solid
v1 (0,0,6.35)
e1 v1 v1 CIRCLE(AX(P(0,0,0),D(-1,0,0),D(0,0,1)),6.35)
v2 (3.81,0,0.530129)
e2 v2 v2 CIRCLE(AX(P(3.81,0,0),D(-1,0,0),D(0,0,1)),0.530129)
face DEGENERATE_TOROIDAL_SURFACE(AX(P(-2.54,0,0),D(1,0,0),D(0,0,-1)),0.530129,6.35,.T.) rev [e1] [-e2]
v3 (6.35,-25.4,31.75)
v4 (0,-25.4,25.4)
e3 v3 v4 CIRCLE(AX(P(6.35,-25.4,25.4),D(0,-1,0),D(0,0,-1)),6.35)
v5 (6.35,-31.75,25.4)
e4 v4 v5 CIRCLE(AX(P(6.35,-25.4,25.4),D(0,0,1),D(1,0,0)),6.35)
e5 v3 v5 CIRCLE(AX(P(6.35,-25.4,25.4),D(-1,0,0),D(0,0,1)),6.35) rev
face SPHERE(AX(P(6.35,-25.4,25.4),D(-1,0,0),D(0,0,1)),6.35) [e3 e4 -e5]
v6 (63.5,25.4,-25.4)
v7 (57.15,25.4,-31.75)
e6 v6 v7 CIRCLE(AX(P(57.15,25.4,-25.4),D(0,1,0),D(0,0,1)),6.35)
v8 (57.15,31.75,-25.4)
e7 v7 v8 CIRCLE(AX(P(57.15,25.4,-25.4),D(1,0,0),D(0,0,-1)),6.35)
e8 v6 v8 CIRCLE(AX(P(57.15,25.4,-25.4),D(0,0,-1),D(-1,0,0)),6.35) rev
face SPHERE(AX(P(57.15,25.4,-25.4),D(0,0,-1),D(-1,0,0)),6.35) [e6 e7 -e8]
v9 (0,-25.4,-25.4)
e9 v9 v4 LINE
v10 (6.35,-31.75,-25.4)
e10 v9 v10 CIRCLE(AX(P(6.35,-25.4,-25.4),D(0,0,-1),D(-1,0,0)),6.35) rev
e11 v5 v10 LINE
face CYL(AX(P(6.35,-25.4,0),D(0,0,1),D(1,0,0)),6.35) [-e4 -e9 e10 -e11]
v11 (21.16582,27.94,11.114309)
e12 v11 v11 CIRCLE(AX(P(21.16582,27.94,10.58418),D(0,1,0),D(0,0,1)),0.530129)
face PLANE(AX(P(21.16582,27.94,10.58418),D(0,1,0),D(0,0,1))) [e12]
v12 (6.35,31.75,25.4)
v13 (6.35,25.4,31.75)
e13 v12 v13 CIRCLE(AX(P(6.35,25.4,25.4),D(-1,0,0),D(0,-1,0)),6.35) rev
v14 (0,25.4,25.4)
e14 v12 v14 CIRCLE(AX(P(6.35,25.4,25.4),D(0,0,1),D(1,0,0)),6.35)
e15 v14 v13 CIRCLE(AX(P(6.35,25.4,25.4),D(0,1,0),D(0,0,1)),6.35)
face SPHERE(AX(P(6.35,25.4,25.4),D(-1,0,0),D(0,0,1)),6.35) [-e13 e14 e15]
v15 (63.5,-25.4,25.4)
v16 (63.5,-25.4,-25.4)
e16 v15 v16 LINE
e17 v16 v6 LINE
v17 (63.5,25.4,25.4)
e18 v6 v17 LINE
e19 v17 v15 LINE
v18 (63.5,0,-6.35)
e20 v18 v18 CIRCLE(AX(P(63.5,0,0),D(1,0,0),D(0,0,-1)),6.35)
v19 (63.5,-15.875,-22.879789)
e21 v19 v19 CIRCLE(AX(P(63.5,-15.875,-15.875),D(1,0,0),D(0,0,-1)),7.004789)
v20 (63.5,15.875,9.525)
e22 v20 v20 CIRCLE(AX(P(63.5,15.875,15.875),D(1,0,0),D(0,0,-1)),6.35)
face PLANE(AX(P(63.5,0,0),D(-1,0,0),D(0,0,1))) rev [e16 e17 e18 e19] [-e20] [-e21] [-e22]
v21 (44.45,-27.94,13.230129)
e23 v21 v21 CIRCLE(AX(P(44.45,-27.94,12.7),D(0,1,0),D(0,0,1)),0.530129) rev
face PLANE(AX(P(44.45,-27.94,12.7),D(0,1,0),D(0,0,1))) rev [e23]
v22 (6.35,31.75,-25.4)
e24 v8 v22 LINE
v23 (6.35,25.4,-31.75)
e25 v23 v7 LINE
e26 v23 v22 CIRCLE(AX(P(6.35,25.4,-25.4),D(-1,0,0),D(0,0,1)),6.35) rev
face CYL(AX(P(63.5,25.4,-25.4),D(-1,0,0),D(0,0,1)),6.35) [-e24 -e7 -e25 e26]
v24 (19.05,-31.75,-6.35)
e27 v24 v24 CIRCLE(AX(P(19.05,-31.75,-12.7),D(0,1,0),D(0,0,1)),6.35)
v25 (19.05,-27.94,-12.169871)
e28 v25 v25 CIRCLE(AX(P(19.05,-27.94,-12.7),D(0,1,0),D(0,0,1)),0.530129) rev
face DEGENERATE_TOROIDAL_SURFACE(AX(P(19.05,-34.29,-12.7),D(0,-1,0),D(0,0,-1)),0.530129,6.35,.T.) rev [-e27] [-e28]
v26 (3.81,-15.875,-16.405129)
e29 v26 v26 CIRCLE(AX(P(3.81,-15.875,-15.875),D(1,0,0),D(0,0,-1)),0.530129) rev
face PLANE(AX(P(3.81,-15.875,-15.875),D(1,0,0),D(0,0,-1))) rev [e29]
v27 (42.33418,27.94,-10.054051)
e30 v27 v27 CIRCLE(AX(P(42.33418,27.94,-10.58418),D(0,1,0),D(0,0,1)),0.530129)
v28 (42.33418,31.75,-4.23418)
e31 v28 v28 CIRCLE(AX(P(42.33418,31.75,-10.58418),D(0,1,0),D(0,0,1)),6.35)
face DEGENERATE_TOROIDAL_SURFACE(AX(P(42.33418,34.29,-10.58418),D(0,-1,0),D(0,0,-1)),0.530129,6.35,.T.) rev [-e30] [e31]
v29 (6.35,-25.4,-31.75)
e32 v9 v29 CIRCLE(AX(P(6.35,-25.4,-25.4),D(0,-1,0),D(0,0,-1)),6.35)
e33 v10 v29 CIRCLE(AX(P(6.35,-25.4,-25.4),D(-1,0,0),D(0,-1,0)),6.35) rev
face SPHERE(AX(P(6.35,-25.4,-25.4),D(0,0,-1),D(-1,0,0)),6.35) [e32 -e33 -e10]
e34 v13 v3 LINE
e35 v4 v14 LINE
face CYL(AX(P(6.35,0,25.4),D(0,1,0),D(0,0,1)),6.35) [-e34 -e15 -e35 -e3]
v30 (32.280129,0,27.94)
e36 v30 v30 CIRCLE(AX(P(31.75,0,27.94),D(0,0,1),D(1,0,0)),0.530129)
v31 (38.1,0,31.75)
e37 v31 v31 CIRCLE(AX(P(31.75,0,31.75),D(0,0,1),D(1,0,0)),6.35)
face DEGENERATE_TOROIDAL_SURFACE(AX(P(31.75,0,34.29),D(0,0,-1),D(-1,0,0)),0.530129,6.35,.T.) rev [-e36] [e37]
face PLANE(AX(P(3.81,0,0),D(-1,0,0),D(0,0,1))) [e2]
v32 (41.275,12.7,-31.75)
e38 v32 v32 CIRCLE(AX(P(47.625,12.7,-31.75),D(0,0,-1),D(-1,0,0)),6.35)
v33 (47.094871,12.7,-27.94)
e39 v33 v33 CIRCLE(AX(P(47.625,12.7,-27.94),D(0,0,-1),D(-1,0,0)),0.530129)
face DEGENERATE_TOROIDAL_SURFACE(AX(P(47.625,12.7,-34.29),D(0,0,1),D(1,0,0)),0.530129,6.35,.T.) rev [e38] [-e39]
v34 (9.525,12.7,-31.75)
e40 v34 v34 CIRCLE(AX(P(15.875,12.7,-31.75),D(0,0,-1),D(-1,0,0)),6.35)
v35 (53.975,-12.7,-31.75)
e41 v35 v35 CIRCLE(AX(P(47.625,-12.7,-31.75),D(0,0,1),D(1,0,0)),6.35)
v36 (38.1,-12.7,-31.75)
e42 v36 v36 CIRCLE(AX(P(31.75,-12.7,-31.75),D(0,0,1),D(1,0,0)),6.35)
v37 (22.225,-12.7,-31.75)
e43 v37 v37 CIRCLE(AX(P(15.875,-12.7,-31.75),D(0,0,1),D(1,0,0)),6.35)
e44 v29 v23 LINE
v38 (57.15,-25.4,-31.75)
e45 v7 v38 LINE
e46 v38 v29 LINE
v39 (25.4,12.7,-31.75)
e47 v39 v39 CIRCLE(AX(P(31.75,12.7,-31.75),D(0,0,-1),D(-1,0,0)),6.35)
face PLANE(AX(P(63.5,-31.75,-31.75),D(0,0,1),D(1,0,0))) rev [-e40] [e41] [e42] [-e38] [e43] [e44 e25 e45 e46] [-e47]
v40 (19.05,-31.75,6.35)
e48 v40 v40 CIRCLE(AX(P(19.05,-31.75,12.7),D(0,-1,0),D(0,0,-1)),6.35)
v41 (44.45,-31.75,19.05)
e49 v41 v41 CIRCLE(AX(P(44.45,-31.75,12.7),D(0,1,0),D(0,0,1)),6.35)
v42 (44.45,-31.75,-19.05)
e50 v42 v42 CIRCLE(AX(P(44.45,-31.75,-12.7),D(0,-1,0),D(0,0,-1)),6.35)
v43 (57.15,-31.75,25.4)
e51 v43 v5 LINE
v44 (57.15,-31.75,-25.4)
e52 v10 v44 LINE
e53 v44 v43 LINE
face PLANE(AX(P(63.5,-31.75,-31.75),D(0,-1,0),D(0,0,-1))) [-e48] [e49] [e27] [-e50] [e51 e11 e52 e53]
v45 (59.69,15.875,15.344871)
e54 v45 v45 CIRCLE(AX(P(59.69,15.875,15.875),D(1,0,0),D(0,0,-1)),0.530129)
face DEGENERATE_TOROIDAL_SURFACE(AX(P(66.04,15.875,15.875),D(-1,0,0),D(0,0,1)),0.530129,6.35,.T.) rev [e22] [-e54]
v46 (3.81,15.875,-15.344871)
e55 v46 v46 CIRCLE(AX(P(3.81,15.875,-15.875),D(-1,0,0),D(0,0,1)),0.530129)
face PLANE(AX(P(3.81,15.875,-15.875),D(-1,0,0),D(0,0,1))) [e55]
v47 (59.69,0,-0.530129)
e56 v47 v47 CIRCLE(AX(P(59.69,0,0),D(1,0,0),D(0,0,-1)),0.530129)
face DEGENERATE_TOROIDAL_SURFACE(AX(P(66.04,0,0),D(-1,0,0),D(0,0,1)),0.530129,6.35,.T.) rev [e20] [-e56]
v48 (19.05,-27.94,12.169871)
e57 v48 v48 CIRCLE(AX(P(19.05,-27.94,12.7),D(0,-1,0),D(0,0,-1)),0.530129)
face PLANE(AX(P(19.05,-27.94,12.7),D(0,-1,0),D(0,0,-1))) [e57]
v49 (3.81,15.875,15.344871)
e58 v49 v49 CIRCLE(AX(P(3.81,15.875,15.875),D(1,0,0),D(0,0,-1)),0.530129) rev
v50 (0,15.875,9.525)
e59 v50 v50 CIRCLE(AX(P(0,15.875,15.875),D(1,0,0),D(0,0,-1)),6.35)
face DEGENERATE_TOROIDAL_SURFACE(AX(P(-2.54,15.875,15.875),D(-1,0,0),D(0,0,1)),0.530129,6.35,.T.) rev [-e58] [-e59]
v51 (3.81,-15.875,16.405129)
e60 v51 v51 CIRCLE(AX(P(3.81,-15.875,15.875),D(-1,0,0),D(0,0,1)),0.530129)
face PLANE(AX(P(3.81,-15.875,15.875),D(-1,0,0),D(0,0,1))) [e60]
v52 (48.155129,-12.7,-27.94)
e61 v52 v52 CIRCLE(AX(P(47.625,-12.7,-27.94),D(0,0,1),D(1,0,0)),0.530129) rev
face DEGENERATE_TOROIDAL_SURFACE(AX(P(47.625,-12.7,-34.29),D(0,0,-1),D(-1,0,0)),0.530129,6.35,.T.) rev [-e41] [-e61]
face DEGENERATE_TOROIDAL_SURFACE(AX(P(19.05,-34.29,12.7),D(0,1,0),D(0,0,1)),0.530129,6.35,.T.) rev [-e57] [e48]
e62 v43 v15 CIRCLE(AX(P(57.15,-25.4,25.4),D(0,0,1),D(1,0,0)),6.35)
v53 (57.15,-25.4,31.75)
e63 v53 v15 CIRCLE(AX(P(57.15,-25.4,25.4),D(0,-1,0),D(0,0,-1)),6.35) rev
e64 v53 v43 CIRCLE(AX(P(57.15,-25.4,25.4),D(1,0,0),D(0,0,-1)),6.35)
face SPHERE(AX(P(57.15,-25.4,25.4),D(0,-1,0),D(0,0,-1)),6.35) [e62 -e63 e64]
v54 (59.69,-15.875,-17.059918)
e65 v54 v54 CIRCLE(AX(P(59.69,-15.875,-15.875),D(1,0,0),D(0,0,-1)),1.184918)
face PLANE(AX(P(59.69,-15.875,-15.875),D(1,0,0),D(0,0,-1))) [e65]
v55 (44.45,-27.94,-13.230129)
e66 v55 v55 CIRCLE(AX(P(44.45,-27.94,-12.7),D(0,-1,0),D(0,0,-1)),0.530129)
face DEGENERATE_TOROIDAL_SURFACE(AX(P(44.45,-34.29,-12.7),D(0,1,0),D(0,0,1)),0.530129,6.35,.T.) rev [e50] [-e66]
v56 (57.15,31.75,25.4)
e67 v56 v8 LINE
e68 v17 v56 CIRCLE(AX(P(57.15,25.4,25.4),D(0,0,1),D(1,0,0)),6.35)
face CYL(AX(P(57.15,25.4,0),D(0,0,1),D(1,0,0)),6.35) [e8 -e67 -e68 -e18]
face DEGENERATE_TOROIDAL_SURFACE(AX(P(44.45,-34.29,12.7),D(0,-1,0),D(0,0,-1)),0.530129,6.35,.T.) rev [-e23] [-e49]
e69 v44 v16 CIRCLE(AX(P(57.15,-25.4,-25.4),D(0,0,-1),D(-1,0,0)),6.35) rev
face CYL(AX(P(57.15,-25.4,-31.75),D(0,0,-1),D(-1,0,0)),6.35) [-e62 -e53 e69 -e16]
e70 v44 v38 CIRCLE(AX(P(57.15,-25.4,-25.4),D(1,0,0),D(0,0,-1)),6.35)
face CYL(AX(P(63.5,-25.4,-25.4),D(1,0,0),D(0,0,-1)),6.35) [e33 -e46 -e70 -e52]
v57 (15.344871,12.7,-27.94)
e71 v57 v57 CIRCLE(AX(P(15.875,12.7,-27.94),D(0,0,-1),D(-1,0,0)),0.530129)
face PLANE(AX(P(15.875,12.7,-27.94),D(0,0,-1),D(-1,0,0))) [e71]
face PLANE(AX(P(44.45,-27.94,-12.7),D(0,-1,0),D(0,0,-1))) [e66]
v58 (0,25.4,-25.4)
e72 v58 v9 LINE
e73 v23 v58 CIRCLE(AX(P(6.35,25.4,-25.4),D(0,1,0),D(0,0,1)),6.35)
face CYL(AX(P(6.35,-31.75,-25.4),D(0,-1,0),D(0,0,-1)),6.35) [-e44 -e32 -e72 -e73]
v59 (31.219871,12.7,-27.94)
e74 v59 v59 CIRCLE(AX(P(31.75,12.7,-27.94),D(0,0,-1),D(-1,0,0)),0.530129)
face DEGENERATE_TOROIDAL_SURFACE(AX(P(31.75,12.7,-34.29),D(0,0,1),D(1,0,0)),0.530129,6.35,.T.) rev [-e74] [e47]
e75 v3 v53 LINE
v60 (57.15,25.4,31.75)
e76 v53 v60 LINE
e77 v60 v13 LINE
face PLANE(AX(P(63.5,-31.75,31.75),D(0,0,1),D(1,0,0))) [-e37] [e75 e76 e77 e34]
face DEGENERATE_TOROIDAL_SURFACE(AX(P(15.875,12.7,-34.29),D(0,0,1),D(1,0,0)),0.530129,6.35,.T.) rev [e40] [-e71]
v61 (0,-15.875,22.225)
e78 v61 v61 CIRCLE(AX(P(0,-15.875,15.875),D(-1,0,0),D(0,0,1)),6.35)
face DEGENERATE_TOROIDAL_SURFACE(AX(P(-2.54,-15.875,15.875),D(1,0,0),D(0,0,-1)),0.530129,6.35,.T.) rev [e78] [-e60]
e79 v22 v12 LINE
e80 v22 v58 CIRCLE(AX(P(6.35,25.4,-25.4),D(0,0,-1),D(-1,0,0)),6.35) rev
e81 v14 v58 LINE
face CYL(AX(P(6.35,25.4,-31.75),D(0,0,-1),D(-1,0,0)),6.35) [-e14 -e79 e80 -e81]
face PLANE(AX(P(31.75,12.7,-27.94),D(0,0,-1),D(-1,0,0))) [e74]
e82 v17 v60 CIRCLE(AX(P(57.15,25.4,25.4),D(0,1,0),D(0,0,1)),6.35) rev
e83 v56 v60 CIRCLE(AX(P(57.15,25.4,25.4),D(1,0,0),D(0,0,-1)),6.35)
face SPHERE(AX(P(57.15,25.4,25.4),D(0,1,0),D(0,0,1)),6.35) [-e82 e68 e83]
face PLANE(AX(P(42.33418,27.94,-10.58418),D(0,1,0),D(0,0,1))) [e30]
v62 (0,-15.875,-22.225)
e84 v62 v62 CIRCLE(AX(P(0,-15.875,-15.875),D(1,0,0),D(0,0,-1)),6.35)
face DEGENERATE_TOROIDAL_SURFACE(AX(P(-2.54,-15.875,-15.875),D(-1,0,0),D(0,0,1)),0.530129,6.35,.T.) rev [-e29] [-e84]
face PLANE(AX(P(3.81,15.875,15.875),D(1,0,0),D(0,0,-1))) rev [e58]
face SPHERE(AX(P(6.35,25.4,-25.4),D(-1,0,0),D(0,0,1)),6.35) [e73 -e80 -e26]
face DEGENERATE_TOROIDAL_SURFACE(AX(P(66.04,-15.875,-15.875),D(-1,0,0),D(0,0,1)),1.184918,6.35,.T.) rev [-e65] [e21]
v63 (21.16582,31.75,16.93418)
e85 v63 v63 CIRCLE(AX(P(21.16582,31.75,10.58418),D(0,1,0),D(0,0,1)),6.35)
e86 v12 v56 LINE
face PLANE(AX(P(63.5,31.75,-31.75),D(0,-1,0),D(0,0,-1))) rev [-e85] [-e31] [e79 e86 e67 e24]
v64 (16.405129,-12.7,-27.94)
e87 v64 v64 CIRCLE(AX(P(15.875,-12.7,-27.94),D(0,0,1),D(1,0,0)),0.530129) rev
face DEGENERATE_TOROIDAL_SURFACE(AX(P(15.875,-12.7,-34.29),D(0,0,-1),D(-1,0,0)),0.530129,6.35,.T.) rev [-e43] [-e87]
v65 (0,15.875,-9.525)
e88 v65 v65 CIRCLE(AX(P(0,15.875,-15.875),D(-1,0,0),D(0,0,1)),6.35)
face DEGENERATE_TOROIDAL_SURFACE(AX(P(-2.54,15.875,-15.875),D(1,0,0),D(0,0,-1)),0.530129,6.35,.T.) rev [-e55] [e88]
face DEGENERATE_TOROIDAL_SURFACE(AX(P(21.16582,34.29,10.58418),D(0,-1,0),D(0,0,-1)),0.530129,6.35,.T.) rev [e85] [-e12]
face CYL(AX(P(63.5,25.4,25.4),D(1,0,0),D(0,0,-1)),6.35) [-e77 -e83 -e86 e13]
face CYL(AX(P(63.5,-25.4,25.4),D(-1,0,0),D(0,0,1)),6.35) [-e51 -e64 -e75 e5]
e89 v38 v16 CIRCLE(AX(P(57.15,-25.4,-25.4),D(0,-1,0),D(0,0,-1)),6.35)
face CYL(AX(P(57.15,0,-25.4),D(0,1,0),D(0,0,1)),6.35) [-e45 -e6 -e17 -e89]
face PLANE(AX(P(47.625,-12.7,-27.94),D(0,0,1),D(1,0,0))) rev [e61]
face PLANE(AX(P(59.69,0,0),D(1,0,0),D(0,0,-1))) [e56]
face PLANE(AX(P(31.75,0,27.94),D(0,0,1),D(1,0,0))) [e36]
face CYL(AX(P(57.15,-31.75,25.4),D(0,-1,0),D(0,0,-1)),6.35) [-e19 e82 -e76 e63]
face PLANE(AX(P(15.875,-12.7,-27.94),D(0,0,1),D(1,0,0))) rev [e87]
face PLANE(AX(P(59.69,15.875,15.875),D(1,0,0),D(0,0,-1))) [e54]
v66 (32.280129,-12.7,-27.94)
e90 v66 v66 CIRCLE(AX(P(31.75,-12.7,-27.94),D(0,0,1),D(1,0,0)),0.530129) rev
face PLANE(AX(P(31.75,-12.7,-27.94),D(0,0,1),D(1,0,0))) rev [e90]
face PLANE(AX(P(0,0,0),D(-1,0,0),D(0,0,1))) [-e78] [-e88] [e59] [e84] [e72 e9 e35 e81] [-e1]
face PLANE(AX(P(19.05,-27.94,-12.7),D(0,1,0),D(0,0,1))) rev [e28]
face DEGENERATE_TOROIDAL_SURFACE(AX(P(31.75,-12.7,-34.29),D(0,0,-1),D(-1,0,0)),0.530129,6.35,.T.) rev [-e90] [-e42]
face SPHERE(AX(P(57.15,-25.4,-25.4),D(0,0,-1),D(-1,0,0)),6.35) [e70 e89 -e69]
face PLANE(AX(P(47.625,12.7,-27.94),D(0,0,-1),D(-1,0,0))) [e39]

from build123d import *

# Parameters (mm, degrees)
SKETCH3_W           = 63.5
SKETCH3_H           = 63.5
BOSS_EXTRUDE2_DEPTH = 63.5
FILLET1_R           = 6.35
SKETCH4_R           = 6.35
CUT_EXTRUDE2_DEPTH  = 3.81
FILLET2_R           = 6.35
SKETCH6_R           = 6.35
SKETCH6_R_2         = 7.004789397
CUT_EXTRUDE3_DEPTH  = 3.81
FILLET3_R           = 6.35
SKETCH7_R           = 6.35
CUT_EXTRUDE4_DEPTH  = 3.81
FILLET4_R           = 6.35
SKETCH8_R           = 6.35
CUT_EXTRUDE5_DEPTH  = 3.81
FILLET5_R           = 6.35
SKETCH9_R           = 6.35
CUT_EXTRUDE6_DEPTH  = 3.81
FILLET6_R           = 6.35
SKETCH10_R          = 6.35
CUT_EXTRUDE7_DEPTH  = 3.81
FILLET7_R           = 6.35


with BuildPart() as part:
    # Sketch3 → Boss-Extrude2 (new body)
    with BuildSketch(Plane.YZ):
        Rectangle(SKETCH3_W, SKETCH3_H)
    extrude(amount=BOSS_EXTRUDE2_DEPTH)

    # Fillet1
    fillet1_edges = [part.edges().sort_by_distance(p)[0] for p in [
        (63.5, 31.75, 0),
        (63.5, 0, -31.75),
        (63.5, -31.75, 0),
        (0, 0, -31.75),
        (0, 31.75, 0),
        (0, 0, 31.75),
        (0, -31.75, 0),
        (31.75, -31.75, -31.75),
        (31.75, 31.75, -31.75),
        (31.75, 31.75, 31.75),
        (31.75, -31.75, 31.75),
        (63.5, 0, 31.75),
    ]]
    fillet(fillet1_edges, radius=FILLET1_R)

    # Sketch4 → Cut-Extrude2 (cut)
    with BuildSketch(Plane.XY.offset(31.75)):
        with Locations((31.75, 0)):
            Circle(SKETCH4_R)
    extrude(amount=-CUT_EXTRUDE2_DEPTH, mode=Mode.SUBTRACT)

    # Fillet2
    # the kernel refuses this fillet: 6.35 mm, written as the material it adds along each edge
    with BuildSketch(Plane(origin=(31.75, 0, 27.94), x_dir=(1, 0, 0), z_dir=(0, -1, 0))) as fillet2_piece_1:
        with BuildLine():
            CenterArc((0.530128867, 6.35), FILLET2_R, 270, 66.421821522)
            Line((0.530128867, 0), (0.530128867, -0.127))
            Line((0.530128867, -0.127), (6.35, -0.127))
            Line((6.35, -0.127), (6.477, 0))
            ThreePointArc((6.477, 0), (6.477, 1.905), (6.466397423, 3.7592))
            Line((6.466397423, 3.7592), (6.35, 3.81))
        make_face()
    revolve(axis=Axis((31.75, 0, 27.94), (0, 0, 1)))

    # Sketch6 → Cut-Extrude3 (cut)
    with BuildSketch(Plane.YZ.offset(63.5)):
        with Locations(Location((0, 0, 0), (0, 0, 270))):
            Circle(SKETCH6_R)
        with Locations(Location((15.875, 15.875, 0), (0, 0, 270))):
            Circle(SKETCH6_R)
        with Locations(Location((-15.875, -15.875, 0), (0, 0, 270))):
            Circle(SKETCH6_R_2)
    extrude(amount=-CUT_EXTRUDE3_DEPTH, mode=Mode.SUBTRACT)

    # Fillet3
    # the kernel refuses this fillet: 6.35 mm, written as the material it adds along each edge
    with BuildSketch(Plane(origin=(59.69, -15.875, -15.875), x_dir=(0, 0, -1), z_dir=(0, -1, 0))) as fillet3_piece_1:
        with BuildLine():
            CenterArc((1.184918264, 6.35), FILLET3_R, 270, 66.421821522)
            Line((1.184918264, 0), (1.184918264, -0.127))
            Line((1.184918264, -0.127), (7.004789397, -0.127))
            Line((7.004789397, -0.127), (7.131789397, 0))
            ThreePointArc((7.131789397, 0), (7.131789397, 1.905), (7.12118682, 3.7592))
            Line((7.12118682, 3.7592), (7.004789397, 3.81))
        make_face()
    revolve(axis=Axis((59.69, -15.875, -15.875), (1, 0, 0)))
    with BuildSketch(Plane(origin=(59.69, 0, 0), x_dir=(0, 0, -1), z_dir=(0, -1, 0))) as fillet3_piece_2:
        with BuildLine():
            CenterArc((0.530128867, 6.35), FILLET3_R, 270, 66.421821522)
            Line((0.530128867, 0), (0.530128867, -0.127))
            Line((0.530128867, -0.127), (6.35, -0.127))
            Line((6.35, -0.127), (6.477, 0))
            ThreePointArc((6.477, 0), (6.477, 1.905), (6.466397423, 3.7592))
            Line((6.466397423, 3.7592), (6.35, 3.81))
        make_face()
    revolve(axis=Axis((59.69, 0, 0), (1, 0, 0)))
    with BuildSketch(Plane(origin=(59.69, 15.875, 15.875), x_dir=(0, 0, -1), z_dir=(0, -1, 0))) as fillet3_piece_3:
        with BuildLine():
            CenterArc((0.530128867, 6.35), FILLET3_R, 270, 66.421821522)
            Line((0.530128867, 0), (0.530128867, -0.127))
            Line((0.530128867, -0.127), (6.35, -0.127))
            Line((6.35, -0.127), (6.477, 0))
            ThreePointArc((6.477, 0), (6.477, 1.905), (6.466397423, 3.7592))
            Line((6.466397423, 3.7592), (6.35, 3.81))
        make_face()
    revolve(axis=Axis((59.69, 15.875, 15.875), (1, 0, 0)))

    # Sketch7 → Cut-Extrude4 (cut)
    with BuildSketch(Plane(origin=(0, 31.75, 0), x_dir=(-1, 0, 0), z_dir=(0, 1, 0))):
        with Locations(Location((-21.16582, 10.58418, 0), (0, 0, 90))):
            Circle(SKETCH7_R)
        with Locations(Location((-42.33418, -10.58418, 0), (0, 0, 90))):
            Circle(SKETCH7_R)
    extrude(amount=-CUT_EXTRUDE4_DEPTH, mode=Mode.SUBTRACT)

    # Fillet4
    # the kernel refuses this fillet: 6.35 mm, written as the material it adds along each edge
    with BuildSketch(Plane(origin=(42.33418, 27.94, -10.58418), x_dir=(0, 0, 1), z_dir=(-1, 0, 0))) as fillet4_piece_1:
        with BuildLine():
            CenterArc((0.530128867, 6.35), FILLET4_R, 270, 66.421821522)
            Line((0.530128867, 0), (0.530128867, -0.127))
            Line((0.530128867, -0.127), (6.35, -0.127))
            Line((6.35, -0.127), (6.477, 0))
            ThreePointArc((6.477, 0), (6.477, 1.905), (6.466397423, 3.7592))
            Line((6.466397423, 3.7592), (6.35, 3.81))
        make_face()
    revolve(axis=Axis((42.33418, 27.94, -10.58418), (0, 1, 0)))
    with BuildSketch(Plane(origin=(21.16582, 27.94, 10.58418), x_dir=(0, 0, 1), z_dir=(-1, 0, 0))) as fillet4_piece_2:
        with BuildLine():
            CenterArc((0.530128867, 6.35), FILLET4_R, 270, 66.421821522)
            Line((0.530128867, 0), (0.530128867, -0.127))
            Line((0.530128867, -0.127), (6.35, -0.127))
            Line((6.35, -0.127), (6.477, 0))
            ThreePointArc((6.477, 0), (6.477, 1.905), (6.466397423, 3.7592))
            Line((6.466397423, 3.7592), (6.35, 3.81))
        make_face()
    revolve(axis=Axis((21.16582, 27.94, 10.58418), (0, 1, 0)))

    # Sketch8 → Cut-Extrude5 (cut)
    with BuildSketch(Plane.XZ.offset(31.75)):
        with Locations(Location((19.05, 12.7, 0), (0, 0, 270))):
            Circle(SKETCH8_R)
        with Locations(Location((44.45, 12.7, 0), (0, 0, 270))):
            Circle(SKETCH8_R)
        with Locations(Location((44.45, -12.7, 0), (0, 0, 270))):
            Circle(SKETCH8_R)
        with Locations(Location((19.05, -12.7, 0), (0, 0, 270))):
            Circle(SKETCH8_R)
    extrude(amount=-CUT_EXTRUDE5_DEPTH, mode=Mode.SUBTRACT)

    # Fillet5
    # the kernel refuses this fillet: 6.35 mm, written as the material it adds along each edge
    with BuildSketch(Plane(origin=(44.45, -27.94, -12.7), x_dir=(0, 0, -1), z_dir=(-1, 0, 0))) as fillet5_piece_1:
        with BuildLine():
            CenterArc((0.530128867, 6.35), FILLET5_R, 270, 66.421821522)
            Line((0.530128867, 0), (0.530128867, -0.127))
            Line((0.530128867, -0.127), (6.35, -0.127))
            Line((6.35, -0.127), (6.477, 0))
            ThreePointArc((6.477, 0), (6.477, 1.905), (6.466397423, 3.7592))
            Line((6.466397423, 3.7592), (6.35, 3.81))
        make_face()
    revolve(axis=Axis((44.45, -27.94, -12.7), (0, -1, 0)))
    with BuildSketch(Plane(origin=(19.05, -27.94, -12.7), x_dir=(0, 0, -1), z_dir=(-1, 0, 0))) as fillet5_piece_2:
        with BuildLine():
            CenterArc((0.530128867, 6.35), FILLET5_R, 270, 66.421821522)
            Line((0.530128867, 0), (0.530128867, -0.127))
            Line((0.530128867, -0.127), (6.35, -0.127))
            Line((6.35, -0.127), (6.477, 0))
            ThreePointArc((6.477, 0), (6.477, 1.905), (6.466397423, 3.7592))
            Line((6.466397423, 3.7592), (6.35, 3.81))
        make_face()
    revolve(axis=Axis((19.05, -27.94, -12.7), (0, -1, 0)))
    with BuildSketch(Plane(origin=(19.05, -27.94, 12.7), x_dir=(0, 0, -1), z_dir=(-1, 0, 0))) as fillet5_piece_3:
        with BuildLine():
            CenterArc((0.530128867, 6.35), FILLET5_R, 270, 66.421821522)
            Line((0.530128867, 0), (0.530128867, -0.127))
            Line((0.530128867, -0.127), (6.35, -0.127))
            Line((6.35, -0.127), (6.477, 0))
            ThreePointArc((6.477, 0), (6.477, 1.905), (6.466397423, 3.7592))
            Line((6.466397423, 3.7592), (6.35, 3.81))
        make_face()
    revolve(axis=Axis((19.05, -27.94, 12.7), (0, -1, 0)))
    with BuildSketch(Plane(origin=(44.45, -27.94, 12.7), x_dir=(0, 0, -1), z_dir=(-1, 0, 0))) as fillet5_piece_4:
        with BuildLine():
            CenterArc((0.530128867, 6.35), FILLET5_R, 270, 66.421821522)
            Line((0.530128867, 0), (0.530128867, -0.127))
            Line((0.530128867, -0.127), (6.35, -0.127))
            Line((6.35, -0.127), (6.477, 0))
            ThreePointArc((6.477, 0), (6.477, 1.905), (6.466397423, 3.7592))
            Line((6.466397423, 3.7592), (6.35, 3.81))
        make_face()
    revolve(axis=Axis((44.45, -27.94, 12.7), (0, -1, 0)))

    # Sketch9 → Cut-Extrude6 (cut)
    with BuildSketch(Plane(origin=(0, 0, 0), x_dir=(0, -1, 0), z_dir=(-1, 0, 0))):
        with Locations(Location((0, 0, 0), (0, 0, 90))):
            Circle(SKETCH9_R)
        with Locations(Location((15.875, 15.875, 0), (0, 0, 90))):
            Circle(SKETCH9_R)
        with Locations(Location((-15.875, 15.875, 0), (0, 0, 90))):
            Circle(SKETCH9_R)
        with Locations(Location((15.875, -15.875, 0), (0, 0, 90))):
            Circle(SKETCH9_R)
        with Locations(Location((-15.875, -15.875, 0), (0, 0, 90))):
            Circle(SKETCH9_R)
    extrude(amount=-CUT_EXTRUDE6_DEPTH, mode=Mode.SUBTRACT)

    # Fillet6
    # the kernel refuses this fillet: 6.35 mm, written as the material it adds along each edge
    with BuildSketch(Plane(origin=(3.81, -15.875, 15.875), x_dir=(0, 0, 1), z_dir=(0, -1, 0))) as fillet6_piece_1:
        with BuildLine():
            CenterArc((0.530128867, 6.35), FILLET6_R, 270, 66.421821522)
            Line((0.530128867, 0), (0.530128867, -0.127))
            Line((0.530128867, -0.127), (6.35, -0.127))
            Line((6.35, -0.127), (6.477, 0))
            ThreePointArc((6.477, 0), (6.477, 1.905), (6.466397423, 3.7592))
            Line((6.466397423, 3.7592), (6.35, 3.81))
        make_face()
    revolve(axis=Axis((3.81, -15.875, 15.875), (-1, 0, 0)))
    with BuildSketch(Plane(origin=(3.81, 15.875, -15.875), x_dir=(0, 0, 1), z_dir=(0, -1, 0))) as fillet6_piece_2:
        with BuildLine():
            CenterArc((0.530128867, 6.35), FILLET6_R, 270, 66.421821522)
            Line((0.530128867, 0), (0.530128867, -0.127))
            Line((0.530128867, -0.127), (6.35, -0.127))
            Line((6.35, -0.127), (6.477, 0))
            ThreePointArc((6.477, 0), (6.477, 1.905), (6.466397423, 3.7592))
            Line((6.466397423, 3.7592), (6.35, 3.81))
        make_face()
    revolve(axis=Axis((3.81, 15.875, -15.875), (-1, 0, 0)))
    with BuildSketch(Plane(origin=(3.81, -15.875, -15.875), x_dir=(0, 0, 1), z_dir=(0, -1, 0))) as fillet6_piece_3:
        with BuildLine():
            CenterArc((0.530128867, 6.35), FILLET6_R, 270, 66.421821522)
            Line((0.530128867, 0), (0.530128867, -0.127))
            Line((0.530128867, -0.127), (6.35, -0.127))
            Line((6.35, -0.127), (6.477, 0))
            ThreePointArc((6.477, 0), (6.477, 1.905), (6.466397423, 3.7592))
            Line((6.466397423, 3.7592), (6.35, 3.81))
        make_face()
    revolve(axis=Axis((3.81, -15.875, -15.875), (-1, 0, 0)))
    with BuildSketch(Plane(origin=(3.81, 15.875, 15.875), x_dir=(0, 0, 1), z_dir=(0, -1, 0))) as fillet6_piece_4:
        with BuildLine():
            CenterArc((0.530128867, 6.35), FILLET6_R, 270, 66.421821522)
            Line((0.530128867, 0), (0.530128867, -0.127))
            Line((0.530128867, -0.127), (6.35, -0.127))
            Line((6.35, -0.127), (6.477, 0))
            ThreePointArc((6.477, 0), (6.477, 1.905), (6.466397423, 3.7592))
            Line((6.466397423, 3.7592), (6.35, 3.81))
        make_face()
    revolve(axis=Axis((3.81, 15.875, 15.875), (-1, 0, 0)))
    with BuildSketch(Plane(origin=(3.81, 0, 0), x_dir=(0, 0, 1), z_dir=(0, -1, 0))) as fillet6_piece_5:
        with BuildLine():
            CenterArc((0.530128867, 6.35), FILLET6_R, 270, 66.421821522)
            Line((0.530128867, 0), (0.530128867, -0.127))
            Line((0.530128867, -0.127), (6.35, -0.127))
            Line((6.35, -0.127), (6.477, 0))
            ThreePointArc((6.477, 0), (6.477, 1.905), (6.466397423, 3.7592))
            Line((6.466397423, 3.7592), (6.35, 3.81))
        make_face()
    revolve(axis=Axis((3.81, 0, 0), (-1, 0, 0)))

    # Sketch10 → Cut-Extrude7 (cut)
    with BuildSketch(Plane(origin=(0, 0, -31.75), x_dir=(1, 0, 0), z_dir=(0, 0, -1))):
        with Locations(Location((31.75, -12.7, 0), (0, 0, 180))):
            Circle(SKETCH10_R)
        with Locations(Location((15.875, -12.7, 0), (0, 0, 180))):
            Circle(SKETCH10_R)
        with Locations(Location((47.625, -12.7, 0), (0, 0, 180))):
            Circle(SKETCH10_R)
        with Locations(Location((47.625, 12.7, 0), (0, 0, 180))):
            Circle(SKETCH10_R)
        with Locations(Location((31.75, 12.7, 0), (0, 0, 180))):
            Circle(SKETCH10_R)
        with Locations(Location((15.875, 12.7, 0), (0, 0, 180))):
            Circle(SKETCH10_R)
    extrude(amount=-CUT_EXTRUDE7_DEPTH, mode=Mode.SUBTRACT)

    # Fillet7
    # the kernel refuses this fillet: 6.35 mm, written as the material it adds along each edge
    with BuildSketch(Plane(origin=(47.625, 12.7, -27.94), x_dir=(-1, 0, 0), z_dir=(0, -1, 0))) as fillet7_piece_1:
        with BuildLine():
            CenterArc((0.530128867, 6.35), FILLET7_R, 270, 66.421821522)
            Line((0.530128867, 0), (0.530128867, -0.127))
            Line((0.530128867, -0.127), (6.35, -0.127))
            Line((6.35, -0.127), (6.477, 0))
            ThreePointArc((6.477, 0), (6.477, 1.905), (6.466397423, 3.7592))
            Line((6.466397423, 3.7592), (6.35, 3.81))
        make_face()
    revolve(axis=Axis((47.625, 12.7, -27.94), (0, 0, -1)))
    with BuildSketch(Plane(origin=(31.75, -12.7, -27.94), x_dir=(-1, 0, 0), z_dir=(0, -1, 0))) as fillet7_piece_2:
        with BuildLine():
            CenterArc((0.530128867, 6.35), FILLET7_R, 270, 66.421821522)
            Line((0.530128867, 0), (0.530128867, -0.127))
            Line((0.530128867, -0.127), (6.35, -0.127))
            Line((6.35, -0.127), (6.477, 0))
            ThreePointArc((6.477, 0), (6.477, 1.905), (6.466397423, 3.7592))
            Line((6.466397423, 3.7592), (6.35, 3.81))
        make_face()
    revolve(axis=Axis((31.75, -12.7, -27.94), (0, 0, -1)))
    with BuildSketch(Plane(origin=(15.875, -12.7, -27.94), x_dir=(-1, 0, 0), z_dir=(0, -1, 0))) as fillet7_piece_3:
        with BuildLine():
            CenterArc((0.530128867, 6.35), FILLET7_R, 270, 66.421821522)
            Line((0.530128867, 0), (0.530128867, -0.127))
            Line((0.530128867, -0.127), (6.35, -0.127))
            Line((6.35, -0.127), (6.477, 0))
            ThreePointArc((6.477, 0), (6.477, 1.905), (6.466397423, 3.7592))
            Line((6.466397423, 3.7592), (6.35, 3.81))
        make_face()
    revolve(axis=Axis((15.875, -12.7, -27.94), (0, 0, -1)))
    with BuildSketch(Plane(origin=(31.75, 12.7, -27.94), x_dir=(-1, 0, 0), z_dir=(0, -1, 0))) as fillet7_piece_4:
        with BuildLine():
            CenterArc((0.530128867, 6.35), FILLET7_R, 270, 66.421821522)
            Line((0.530128867, 0), (0.530128867, -0.127))
            Line((0.530128867, -0.127), (6.35, -0.127))
            Line((6.35, -0.127), (6.477, 0))
            ThreePointArc((6.477, 0), (6.477, 1.905), (6.466397423, 3.7592))
            Line((6.466397423, 3.7592), (6.35, 3.81))
        make_face()
    revolve(axis=Axis((31.75, 12.7, -27.94), (0, 0, -1)))
    with BuildSketch(Plane(origin=(47.625, -12.7, -27.94), x_dir=(-1, 0, 0), z_dir=(0, -1, 0))) as fillet7_piece_5:
        with BuildLine():
            CenterArc((0.530128867, 6.35), FILLET7_R, 270, 66.421821522)
            Line((0.530128867, 0), (0.530128867, -0.127))
            Line((0.530128867, -0.127), (6.35, -0.127))
            Line((6.35, -0.127), (6.477, 0))
            ThreePointArc((6.477, 0), (6.477, 1.905), (6.466397423, 3.7592))
            Line((6.466397423, 3.7592), (6.35, 3.81))
        make_face()
    revolve(axis=Axis((47.625, -12.7, -27.94), (0, 0, -1)))
    with BuildSketch(Plane(origin=(15.875, 12.7, -27.94), x_dir=(-1, 0, 0), z_dir=(0, -1, 0))) as fillet7_piece_6:
        with BuildLine():
            CenterArc((0.530128867, 6.35), FILLET7_R, 270, 66.421821522)
            Line((0.530128867, 0), (0.530128867, -0.127))
            Line((0.530128867, -0.127), (6.35, -0.127))
            Line((6.35, -0.127), (6.477, 0))
            ThreePointArc((6.477, 0), (6.477, 1.905), (6.466397423, 3.7592))
            Line((6.466397423, 3.7592), (6.35, 3.81))
        make_face()
    revolve(axis=Axis((15.875, 12.7, -27.94), (0, 0, -1)))


solid = part.part
